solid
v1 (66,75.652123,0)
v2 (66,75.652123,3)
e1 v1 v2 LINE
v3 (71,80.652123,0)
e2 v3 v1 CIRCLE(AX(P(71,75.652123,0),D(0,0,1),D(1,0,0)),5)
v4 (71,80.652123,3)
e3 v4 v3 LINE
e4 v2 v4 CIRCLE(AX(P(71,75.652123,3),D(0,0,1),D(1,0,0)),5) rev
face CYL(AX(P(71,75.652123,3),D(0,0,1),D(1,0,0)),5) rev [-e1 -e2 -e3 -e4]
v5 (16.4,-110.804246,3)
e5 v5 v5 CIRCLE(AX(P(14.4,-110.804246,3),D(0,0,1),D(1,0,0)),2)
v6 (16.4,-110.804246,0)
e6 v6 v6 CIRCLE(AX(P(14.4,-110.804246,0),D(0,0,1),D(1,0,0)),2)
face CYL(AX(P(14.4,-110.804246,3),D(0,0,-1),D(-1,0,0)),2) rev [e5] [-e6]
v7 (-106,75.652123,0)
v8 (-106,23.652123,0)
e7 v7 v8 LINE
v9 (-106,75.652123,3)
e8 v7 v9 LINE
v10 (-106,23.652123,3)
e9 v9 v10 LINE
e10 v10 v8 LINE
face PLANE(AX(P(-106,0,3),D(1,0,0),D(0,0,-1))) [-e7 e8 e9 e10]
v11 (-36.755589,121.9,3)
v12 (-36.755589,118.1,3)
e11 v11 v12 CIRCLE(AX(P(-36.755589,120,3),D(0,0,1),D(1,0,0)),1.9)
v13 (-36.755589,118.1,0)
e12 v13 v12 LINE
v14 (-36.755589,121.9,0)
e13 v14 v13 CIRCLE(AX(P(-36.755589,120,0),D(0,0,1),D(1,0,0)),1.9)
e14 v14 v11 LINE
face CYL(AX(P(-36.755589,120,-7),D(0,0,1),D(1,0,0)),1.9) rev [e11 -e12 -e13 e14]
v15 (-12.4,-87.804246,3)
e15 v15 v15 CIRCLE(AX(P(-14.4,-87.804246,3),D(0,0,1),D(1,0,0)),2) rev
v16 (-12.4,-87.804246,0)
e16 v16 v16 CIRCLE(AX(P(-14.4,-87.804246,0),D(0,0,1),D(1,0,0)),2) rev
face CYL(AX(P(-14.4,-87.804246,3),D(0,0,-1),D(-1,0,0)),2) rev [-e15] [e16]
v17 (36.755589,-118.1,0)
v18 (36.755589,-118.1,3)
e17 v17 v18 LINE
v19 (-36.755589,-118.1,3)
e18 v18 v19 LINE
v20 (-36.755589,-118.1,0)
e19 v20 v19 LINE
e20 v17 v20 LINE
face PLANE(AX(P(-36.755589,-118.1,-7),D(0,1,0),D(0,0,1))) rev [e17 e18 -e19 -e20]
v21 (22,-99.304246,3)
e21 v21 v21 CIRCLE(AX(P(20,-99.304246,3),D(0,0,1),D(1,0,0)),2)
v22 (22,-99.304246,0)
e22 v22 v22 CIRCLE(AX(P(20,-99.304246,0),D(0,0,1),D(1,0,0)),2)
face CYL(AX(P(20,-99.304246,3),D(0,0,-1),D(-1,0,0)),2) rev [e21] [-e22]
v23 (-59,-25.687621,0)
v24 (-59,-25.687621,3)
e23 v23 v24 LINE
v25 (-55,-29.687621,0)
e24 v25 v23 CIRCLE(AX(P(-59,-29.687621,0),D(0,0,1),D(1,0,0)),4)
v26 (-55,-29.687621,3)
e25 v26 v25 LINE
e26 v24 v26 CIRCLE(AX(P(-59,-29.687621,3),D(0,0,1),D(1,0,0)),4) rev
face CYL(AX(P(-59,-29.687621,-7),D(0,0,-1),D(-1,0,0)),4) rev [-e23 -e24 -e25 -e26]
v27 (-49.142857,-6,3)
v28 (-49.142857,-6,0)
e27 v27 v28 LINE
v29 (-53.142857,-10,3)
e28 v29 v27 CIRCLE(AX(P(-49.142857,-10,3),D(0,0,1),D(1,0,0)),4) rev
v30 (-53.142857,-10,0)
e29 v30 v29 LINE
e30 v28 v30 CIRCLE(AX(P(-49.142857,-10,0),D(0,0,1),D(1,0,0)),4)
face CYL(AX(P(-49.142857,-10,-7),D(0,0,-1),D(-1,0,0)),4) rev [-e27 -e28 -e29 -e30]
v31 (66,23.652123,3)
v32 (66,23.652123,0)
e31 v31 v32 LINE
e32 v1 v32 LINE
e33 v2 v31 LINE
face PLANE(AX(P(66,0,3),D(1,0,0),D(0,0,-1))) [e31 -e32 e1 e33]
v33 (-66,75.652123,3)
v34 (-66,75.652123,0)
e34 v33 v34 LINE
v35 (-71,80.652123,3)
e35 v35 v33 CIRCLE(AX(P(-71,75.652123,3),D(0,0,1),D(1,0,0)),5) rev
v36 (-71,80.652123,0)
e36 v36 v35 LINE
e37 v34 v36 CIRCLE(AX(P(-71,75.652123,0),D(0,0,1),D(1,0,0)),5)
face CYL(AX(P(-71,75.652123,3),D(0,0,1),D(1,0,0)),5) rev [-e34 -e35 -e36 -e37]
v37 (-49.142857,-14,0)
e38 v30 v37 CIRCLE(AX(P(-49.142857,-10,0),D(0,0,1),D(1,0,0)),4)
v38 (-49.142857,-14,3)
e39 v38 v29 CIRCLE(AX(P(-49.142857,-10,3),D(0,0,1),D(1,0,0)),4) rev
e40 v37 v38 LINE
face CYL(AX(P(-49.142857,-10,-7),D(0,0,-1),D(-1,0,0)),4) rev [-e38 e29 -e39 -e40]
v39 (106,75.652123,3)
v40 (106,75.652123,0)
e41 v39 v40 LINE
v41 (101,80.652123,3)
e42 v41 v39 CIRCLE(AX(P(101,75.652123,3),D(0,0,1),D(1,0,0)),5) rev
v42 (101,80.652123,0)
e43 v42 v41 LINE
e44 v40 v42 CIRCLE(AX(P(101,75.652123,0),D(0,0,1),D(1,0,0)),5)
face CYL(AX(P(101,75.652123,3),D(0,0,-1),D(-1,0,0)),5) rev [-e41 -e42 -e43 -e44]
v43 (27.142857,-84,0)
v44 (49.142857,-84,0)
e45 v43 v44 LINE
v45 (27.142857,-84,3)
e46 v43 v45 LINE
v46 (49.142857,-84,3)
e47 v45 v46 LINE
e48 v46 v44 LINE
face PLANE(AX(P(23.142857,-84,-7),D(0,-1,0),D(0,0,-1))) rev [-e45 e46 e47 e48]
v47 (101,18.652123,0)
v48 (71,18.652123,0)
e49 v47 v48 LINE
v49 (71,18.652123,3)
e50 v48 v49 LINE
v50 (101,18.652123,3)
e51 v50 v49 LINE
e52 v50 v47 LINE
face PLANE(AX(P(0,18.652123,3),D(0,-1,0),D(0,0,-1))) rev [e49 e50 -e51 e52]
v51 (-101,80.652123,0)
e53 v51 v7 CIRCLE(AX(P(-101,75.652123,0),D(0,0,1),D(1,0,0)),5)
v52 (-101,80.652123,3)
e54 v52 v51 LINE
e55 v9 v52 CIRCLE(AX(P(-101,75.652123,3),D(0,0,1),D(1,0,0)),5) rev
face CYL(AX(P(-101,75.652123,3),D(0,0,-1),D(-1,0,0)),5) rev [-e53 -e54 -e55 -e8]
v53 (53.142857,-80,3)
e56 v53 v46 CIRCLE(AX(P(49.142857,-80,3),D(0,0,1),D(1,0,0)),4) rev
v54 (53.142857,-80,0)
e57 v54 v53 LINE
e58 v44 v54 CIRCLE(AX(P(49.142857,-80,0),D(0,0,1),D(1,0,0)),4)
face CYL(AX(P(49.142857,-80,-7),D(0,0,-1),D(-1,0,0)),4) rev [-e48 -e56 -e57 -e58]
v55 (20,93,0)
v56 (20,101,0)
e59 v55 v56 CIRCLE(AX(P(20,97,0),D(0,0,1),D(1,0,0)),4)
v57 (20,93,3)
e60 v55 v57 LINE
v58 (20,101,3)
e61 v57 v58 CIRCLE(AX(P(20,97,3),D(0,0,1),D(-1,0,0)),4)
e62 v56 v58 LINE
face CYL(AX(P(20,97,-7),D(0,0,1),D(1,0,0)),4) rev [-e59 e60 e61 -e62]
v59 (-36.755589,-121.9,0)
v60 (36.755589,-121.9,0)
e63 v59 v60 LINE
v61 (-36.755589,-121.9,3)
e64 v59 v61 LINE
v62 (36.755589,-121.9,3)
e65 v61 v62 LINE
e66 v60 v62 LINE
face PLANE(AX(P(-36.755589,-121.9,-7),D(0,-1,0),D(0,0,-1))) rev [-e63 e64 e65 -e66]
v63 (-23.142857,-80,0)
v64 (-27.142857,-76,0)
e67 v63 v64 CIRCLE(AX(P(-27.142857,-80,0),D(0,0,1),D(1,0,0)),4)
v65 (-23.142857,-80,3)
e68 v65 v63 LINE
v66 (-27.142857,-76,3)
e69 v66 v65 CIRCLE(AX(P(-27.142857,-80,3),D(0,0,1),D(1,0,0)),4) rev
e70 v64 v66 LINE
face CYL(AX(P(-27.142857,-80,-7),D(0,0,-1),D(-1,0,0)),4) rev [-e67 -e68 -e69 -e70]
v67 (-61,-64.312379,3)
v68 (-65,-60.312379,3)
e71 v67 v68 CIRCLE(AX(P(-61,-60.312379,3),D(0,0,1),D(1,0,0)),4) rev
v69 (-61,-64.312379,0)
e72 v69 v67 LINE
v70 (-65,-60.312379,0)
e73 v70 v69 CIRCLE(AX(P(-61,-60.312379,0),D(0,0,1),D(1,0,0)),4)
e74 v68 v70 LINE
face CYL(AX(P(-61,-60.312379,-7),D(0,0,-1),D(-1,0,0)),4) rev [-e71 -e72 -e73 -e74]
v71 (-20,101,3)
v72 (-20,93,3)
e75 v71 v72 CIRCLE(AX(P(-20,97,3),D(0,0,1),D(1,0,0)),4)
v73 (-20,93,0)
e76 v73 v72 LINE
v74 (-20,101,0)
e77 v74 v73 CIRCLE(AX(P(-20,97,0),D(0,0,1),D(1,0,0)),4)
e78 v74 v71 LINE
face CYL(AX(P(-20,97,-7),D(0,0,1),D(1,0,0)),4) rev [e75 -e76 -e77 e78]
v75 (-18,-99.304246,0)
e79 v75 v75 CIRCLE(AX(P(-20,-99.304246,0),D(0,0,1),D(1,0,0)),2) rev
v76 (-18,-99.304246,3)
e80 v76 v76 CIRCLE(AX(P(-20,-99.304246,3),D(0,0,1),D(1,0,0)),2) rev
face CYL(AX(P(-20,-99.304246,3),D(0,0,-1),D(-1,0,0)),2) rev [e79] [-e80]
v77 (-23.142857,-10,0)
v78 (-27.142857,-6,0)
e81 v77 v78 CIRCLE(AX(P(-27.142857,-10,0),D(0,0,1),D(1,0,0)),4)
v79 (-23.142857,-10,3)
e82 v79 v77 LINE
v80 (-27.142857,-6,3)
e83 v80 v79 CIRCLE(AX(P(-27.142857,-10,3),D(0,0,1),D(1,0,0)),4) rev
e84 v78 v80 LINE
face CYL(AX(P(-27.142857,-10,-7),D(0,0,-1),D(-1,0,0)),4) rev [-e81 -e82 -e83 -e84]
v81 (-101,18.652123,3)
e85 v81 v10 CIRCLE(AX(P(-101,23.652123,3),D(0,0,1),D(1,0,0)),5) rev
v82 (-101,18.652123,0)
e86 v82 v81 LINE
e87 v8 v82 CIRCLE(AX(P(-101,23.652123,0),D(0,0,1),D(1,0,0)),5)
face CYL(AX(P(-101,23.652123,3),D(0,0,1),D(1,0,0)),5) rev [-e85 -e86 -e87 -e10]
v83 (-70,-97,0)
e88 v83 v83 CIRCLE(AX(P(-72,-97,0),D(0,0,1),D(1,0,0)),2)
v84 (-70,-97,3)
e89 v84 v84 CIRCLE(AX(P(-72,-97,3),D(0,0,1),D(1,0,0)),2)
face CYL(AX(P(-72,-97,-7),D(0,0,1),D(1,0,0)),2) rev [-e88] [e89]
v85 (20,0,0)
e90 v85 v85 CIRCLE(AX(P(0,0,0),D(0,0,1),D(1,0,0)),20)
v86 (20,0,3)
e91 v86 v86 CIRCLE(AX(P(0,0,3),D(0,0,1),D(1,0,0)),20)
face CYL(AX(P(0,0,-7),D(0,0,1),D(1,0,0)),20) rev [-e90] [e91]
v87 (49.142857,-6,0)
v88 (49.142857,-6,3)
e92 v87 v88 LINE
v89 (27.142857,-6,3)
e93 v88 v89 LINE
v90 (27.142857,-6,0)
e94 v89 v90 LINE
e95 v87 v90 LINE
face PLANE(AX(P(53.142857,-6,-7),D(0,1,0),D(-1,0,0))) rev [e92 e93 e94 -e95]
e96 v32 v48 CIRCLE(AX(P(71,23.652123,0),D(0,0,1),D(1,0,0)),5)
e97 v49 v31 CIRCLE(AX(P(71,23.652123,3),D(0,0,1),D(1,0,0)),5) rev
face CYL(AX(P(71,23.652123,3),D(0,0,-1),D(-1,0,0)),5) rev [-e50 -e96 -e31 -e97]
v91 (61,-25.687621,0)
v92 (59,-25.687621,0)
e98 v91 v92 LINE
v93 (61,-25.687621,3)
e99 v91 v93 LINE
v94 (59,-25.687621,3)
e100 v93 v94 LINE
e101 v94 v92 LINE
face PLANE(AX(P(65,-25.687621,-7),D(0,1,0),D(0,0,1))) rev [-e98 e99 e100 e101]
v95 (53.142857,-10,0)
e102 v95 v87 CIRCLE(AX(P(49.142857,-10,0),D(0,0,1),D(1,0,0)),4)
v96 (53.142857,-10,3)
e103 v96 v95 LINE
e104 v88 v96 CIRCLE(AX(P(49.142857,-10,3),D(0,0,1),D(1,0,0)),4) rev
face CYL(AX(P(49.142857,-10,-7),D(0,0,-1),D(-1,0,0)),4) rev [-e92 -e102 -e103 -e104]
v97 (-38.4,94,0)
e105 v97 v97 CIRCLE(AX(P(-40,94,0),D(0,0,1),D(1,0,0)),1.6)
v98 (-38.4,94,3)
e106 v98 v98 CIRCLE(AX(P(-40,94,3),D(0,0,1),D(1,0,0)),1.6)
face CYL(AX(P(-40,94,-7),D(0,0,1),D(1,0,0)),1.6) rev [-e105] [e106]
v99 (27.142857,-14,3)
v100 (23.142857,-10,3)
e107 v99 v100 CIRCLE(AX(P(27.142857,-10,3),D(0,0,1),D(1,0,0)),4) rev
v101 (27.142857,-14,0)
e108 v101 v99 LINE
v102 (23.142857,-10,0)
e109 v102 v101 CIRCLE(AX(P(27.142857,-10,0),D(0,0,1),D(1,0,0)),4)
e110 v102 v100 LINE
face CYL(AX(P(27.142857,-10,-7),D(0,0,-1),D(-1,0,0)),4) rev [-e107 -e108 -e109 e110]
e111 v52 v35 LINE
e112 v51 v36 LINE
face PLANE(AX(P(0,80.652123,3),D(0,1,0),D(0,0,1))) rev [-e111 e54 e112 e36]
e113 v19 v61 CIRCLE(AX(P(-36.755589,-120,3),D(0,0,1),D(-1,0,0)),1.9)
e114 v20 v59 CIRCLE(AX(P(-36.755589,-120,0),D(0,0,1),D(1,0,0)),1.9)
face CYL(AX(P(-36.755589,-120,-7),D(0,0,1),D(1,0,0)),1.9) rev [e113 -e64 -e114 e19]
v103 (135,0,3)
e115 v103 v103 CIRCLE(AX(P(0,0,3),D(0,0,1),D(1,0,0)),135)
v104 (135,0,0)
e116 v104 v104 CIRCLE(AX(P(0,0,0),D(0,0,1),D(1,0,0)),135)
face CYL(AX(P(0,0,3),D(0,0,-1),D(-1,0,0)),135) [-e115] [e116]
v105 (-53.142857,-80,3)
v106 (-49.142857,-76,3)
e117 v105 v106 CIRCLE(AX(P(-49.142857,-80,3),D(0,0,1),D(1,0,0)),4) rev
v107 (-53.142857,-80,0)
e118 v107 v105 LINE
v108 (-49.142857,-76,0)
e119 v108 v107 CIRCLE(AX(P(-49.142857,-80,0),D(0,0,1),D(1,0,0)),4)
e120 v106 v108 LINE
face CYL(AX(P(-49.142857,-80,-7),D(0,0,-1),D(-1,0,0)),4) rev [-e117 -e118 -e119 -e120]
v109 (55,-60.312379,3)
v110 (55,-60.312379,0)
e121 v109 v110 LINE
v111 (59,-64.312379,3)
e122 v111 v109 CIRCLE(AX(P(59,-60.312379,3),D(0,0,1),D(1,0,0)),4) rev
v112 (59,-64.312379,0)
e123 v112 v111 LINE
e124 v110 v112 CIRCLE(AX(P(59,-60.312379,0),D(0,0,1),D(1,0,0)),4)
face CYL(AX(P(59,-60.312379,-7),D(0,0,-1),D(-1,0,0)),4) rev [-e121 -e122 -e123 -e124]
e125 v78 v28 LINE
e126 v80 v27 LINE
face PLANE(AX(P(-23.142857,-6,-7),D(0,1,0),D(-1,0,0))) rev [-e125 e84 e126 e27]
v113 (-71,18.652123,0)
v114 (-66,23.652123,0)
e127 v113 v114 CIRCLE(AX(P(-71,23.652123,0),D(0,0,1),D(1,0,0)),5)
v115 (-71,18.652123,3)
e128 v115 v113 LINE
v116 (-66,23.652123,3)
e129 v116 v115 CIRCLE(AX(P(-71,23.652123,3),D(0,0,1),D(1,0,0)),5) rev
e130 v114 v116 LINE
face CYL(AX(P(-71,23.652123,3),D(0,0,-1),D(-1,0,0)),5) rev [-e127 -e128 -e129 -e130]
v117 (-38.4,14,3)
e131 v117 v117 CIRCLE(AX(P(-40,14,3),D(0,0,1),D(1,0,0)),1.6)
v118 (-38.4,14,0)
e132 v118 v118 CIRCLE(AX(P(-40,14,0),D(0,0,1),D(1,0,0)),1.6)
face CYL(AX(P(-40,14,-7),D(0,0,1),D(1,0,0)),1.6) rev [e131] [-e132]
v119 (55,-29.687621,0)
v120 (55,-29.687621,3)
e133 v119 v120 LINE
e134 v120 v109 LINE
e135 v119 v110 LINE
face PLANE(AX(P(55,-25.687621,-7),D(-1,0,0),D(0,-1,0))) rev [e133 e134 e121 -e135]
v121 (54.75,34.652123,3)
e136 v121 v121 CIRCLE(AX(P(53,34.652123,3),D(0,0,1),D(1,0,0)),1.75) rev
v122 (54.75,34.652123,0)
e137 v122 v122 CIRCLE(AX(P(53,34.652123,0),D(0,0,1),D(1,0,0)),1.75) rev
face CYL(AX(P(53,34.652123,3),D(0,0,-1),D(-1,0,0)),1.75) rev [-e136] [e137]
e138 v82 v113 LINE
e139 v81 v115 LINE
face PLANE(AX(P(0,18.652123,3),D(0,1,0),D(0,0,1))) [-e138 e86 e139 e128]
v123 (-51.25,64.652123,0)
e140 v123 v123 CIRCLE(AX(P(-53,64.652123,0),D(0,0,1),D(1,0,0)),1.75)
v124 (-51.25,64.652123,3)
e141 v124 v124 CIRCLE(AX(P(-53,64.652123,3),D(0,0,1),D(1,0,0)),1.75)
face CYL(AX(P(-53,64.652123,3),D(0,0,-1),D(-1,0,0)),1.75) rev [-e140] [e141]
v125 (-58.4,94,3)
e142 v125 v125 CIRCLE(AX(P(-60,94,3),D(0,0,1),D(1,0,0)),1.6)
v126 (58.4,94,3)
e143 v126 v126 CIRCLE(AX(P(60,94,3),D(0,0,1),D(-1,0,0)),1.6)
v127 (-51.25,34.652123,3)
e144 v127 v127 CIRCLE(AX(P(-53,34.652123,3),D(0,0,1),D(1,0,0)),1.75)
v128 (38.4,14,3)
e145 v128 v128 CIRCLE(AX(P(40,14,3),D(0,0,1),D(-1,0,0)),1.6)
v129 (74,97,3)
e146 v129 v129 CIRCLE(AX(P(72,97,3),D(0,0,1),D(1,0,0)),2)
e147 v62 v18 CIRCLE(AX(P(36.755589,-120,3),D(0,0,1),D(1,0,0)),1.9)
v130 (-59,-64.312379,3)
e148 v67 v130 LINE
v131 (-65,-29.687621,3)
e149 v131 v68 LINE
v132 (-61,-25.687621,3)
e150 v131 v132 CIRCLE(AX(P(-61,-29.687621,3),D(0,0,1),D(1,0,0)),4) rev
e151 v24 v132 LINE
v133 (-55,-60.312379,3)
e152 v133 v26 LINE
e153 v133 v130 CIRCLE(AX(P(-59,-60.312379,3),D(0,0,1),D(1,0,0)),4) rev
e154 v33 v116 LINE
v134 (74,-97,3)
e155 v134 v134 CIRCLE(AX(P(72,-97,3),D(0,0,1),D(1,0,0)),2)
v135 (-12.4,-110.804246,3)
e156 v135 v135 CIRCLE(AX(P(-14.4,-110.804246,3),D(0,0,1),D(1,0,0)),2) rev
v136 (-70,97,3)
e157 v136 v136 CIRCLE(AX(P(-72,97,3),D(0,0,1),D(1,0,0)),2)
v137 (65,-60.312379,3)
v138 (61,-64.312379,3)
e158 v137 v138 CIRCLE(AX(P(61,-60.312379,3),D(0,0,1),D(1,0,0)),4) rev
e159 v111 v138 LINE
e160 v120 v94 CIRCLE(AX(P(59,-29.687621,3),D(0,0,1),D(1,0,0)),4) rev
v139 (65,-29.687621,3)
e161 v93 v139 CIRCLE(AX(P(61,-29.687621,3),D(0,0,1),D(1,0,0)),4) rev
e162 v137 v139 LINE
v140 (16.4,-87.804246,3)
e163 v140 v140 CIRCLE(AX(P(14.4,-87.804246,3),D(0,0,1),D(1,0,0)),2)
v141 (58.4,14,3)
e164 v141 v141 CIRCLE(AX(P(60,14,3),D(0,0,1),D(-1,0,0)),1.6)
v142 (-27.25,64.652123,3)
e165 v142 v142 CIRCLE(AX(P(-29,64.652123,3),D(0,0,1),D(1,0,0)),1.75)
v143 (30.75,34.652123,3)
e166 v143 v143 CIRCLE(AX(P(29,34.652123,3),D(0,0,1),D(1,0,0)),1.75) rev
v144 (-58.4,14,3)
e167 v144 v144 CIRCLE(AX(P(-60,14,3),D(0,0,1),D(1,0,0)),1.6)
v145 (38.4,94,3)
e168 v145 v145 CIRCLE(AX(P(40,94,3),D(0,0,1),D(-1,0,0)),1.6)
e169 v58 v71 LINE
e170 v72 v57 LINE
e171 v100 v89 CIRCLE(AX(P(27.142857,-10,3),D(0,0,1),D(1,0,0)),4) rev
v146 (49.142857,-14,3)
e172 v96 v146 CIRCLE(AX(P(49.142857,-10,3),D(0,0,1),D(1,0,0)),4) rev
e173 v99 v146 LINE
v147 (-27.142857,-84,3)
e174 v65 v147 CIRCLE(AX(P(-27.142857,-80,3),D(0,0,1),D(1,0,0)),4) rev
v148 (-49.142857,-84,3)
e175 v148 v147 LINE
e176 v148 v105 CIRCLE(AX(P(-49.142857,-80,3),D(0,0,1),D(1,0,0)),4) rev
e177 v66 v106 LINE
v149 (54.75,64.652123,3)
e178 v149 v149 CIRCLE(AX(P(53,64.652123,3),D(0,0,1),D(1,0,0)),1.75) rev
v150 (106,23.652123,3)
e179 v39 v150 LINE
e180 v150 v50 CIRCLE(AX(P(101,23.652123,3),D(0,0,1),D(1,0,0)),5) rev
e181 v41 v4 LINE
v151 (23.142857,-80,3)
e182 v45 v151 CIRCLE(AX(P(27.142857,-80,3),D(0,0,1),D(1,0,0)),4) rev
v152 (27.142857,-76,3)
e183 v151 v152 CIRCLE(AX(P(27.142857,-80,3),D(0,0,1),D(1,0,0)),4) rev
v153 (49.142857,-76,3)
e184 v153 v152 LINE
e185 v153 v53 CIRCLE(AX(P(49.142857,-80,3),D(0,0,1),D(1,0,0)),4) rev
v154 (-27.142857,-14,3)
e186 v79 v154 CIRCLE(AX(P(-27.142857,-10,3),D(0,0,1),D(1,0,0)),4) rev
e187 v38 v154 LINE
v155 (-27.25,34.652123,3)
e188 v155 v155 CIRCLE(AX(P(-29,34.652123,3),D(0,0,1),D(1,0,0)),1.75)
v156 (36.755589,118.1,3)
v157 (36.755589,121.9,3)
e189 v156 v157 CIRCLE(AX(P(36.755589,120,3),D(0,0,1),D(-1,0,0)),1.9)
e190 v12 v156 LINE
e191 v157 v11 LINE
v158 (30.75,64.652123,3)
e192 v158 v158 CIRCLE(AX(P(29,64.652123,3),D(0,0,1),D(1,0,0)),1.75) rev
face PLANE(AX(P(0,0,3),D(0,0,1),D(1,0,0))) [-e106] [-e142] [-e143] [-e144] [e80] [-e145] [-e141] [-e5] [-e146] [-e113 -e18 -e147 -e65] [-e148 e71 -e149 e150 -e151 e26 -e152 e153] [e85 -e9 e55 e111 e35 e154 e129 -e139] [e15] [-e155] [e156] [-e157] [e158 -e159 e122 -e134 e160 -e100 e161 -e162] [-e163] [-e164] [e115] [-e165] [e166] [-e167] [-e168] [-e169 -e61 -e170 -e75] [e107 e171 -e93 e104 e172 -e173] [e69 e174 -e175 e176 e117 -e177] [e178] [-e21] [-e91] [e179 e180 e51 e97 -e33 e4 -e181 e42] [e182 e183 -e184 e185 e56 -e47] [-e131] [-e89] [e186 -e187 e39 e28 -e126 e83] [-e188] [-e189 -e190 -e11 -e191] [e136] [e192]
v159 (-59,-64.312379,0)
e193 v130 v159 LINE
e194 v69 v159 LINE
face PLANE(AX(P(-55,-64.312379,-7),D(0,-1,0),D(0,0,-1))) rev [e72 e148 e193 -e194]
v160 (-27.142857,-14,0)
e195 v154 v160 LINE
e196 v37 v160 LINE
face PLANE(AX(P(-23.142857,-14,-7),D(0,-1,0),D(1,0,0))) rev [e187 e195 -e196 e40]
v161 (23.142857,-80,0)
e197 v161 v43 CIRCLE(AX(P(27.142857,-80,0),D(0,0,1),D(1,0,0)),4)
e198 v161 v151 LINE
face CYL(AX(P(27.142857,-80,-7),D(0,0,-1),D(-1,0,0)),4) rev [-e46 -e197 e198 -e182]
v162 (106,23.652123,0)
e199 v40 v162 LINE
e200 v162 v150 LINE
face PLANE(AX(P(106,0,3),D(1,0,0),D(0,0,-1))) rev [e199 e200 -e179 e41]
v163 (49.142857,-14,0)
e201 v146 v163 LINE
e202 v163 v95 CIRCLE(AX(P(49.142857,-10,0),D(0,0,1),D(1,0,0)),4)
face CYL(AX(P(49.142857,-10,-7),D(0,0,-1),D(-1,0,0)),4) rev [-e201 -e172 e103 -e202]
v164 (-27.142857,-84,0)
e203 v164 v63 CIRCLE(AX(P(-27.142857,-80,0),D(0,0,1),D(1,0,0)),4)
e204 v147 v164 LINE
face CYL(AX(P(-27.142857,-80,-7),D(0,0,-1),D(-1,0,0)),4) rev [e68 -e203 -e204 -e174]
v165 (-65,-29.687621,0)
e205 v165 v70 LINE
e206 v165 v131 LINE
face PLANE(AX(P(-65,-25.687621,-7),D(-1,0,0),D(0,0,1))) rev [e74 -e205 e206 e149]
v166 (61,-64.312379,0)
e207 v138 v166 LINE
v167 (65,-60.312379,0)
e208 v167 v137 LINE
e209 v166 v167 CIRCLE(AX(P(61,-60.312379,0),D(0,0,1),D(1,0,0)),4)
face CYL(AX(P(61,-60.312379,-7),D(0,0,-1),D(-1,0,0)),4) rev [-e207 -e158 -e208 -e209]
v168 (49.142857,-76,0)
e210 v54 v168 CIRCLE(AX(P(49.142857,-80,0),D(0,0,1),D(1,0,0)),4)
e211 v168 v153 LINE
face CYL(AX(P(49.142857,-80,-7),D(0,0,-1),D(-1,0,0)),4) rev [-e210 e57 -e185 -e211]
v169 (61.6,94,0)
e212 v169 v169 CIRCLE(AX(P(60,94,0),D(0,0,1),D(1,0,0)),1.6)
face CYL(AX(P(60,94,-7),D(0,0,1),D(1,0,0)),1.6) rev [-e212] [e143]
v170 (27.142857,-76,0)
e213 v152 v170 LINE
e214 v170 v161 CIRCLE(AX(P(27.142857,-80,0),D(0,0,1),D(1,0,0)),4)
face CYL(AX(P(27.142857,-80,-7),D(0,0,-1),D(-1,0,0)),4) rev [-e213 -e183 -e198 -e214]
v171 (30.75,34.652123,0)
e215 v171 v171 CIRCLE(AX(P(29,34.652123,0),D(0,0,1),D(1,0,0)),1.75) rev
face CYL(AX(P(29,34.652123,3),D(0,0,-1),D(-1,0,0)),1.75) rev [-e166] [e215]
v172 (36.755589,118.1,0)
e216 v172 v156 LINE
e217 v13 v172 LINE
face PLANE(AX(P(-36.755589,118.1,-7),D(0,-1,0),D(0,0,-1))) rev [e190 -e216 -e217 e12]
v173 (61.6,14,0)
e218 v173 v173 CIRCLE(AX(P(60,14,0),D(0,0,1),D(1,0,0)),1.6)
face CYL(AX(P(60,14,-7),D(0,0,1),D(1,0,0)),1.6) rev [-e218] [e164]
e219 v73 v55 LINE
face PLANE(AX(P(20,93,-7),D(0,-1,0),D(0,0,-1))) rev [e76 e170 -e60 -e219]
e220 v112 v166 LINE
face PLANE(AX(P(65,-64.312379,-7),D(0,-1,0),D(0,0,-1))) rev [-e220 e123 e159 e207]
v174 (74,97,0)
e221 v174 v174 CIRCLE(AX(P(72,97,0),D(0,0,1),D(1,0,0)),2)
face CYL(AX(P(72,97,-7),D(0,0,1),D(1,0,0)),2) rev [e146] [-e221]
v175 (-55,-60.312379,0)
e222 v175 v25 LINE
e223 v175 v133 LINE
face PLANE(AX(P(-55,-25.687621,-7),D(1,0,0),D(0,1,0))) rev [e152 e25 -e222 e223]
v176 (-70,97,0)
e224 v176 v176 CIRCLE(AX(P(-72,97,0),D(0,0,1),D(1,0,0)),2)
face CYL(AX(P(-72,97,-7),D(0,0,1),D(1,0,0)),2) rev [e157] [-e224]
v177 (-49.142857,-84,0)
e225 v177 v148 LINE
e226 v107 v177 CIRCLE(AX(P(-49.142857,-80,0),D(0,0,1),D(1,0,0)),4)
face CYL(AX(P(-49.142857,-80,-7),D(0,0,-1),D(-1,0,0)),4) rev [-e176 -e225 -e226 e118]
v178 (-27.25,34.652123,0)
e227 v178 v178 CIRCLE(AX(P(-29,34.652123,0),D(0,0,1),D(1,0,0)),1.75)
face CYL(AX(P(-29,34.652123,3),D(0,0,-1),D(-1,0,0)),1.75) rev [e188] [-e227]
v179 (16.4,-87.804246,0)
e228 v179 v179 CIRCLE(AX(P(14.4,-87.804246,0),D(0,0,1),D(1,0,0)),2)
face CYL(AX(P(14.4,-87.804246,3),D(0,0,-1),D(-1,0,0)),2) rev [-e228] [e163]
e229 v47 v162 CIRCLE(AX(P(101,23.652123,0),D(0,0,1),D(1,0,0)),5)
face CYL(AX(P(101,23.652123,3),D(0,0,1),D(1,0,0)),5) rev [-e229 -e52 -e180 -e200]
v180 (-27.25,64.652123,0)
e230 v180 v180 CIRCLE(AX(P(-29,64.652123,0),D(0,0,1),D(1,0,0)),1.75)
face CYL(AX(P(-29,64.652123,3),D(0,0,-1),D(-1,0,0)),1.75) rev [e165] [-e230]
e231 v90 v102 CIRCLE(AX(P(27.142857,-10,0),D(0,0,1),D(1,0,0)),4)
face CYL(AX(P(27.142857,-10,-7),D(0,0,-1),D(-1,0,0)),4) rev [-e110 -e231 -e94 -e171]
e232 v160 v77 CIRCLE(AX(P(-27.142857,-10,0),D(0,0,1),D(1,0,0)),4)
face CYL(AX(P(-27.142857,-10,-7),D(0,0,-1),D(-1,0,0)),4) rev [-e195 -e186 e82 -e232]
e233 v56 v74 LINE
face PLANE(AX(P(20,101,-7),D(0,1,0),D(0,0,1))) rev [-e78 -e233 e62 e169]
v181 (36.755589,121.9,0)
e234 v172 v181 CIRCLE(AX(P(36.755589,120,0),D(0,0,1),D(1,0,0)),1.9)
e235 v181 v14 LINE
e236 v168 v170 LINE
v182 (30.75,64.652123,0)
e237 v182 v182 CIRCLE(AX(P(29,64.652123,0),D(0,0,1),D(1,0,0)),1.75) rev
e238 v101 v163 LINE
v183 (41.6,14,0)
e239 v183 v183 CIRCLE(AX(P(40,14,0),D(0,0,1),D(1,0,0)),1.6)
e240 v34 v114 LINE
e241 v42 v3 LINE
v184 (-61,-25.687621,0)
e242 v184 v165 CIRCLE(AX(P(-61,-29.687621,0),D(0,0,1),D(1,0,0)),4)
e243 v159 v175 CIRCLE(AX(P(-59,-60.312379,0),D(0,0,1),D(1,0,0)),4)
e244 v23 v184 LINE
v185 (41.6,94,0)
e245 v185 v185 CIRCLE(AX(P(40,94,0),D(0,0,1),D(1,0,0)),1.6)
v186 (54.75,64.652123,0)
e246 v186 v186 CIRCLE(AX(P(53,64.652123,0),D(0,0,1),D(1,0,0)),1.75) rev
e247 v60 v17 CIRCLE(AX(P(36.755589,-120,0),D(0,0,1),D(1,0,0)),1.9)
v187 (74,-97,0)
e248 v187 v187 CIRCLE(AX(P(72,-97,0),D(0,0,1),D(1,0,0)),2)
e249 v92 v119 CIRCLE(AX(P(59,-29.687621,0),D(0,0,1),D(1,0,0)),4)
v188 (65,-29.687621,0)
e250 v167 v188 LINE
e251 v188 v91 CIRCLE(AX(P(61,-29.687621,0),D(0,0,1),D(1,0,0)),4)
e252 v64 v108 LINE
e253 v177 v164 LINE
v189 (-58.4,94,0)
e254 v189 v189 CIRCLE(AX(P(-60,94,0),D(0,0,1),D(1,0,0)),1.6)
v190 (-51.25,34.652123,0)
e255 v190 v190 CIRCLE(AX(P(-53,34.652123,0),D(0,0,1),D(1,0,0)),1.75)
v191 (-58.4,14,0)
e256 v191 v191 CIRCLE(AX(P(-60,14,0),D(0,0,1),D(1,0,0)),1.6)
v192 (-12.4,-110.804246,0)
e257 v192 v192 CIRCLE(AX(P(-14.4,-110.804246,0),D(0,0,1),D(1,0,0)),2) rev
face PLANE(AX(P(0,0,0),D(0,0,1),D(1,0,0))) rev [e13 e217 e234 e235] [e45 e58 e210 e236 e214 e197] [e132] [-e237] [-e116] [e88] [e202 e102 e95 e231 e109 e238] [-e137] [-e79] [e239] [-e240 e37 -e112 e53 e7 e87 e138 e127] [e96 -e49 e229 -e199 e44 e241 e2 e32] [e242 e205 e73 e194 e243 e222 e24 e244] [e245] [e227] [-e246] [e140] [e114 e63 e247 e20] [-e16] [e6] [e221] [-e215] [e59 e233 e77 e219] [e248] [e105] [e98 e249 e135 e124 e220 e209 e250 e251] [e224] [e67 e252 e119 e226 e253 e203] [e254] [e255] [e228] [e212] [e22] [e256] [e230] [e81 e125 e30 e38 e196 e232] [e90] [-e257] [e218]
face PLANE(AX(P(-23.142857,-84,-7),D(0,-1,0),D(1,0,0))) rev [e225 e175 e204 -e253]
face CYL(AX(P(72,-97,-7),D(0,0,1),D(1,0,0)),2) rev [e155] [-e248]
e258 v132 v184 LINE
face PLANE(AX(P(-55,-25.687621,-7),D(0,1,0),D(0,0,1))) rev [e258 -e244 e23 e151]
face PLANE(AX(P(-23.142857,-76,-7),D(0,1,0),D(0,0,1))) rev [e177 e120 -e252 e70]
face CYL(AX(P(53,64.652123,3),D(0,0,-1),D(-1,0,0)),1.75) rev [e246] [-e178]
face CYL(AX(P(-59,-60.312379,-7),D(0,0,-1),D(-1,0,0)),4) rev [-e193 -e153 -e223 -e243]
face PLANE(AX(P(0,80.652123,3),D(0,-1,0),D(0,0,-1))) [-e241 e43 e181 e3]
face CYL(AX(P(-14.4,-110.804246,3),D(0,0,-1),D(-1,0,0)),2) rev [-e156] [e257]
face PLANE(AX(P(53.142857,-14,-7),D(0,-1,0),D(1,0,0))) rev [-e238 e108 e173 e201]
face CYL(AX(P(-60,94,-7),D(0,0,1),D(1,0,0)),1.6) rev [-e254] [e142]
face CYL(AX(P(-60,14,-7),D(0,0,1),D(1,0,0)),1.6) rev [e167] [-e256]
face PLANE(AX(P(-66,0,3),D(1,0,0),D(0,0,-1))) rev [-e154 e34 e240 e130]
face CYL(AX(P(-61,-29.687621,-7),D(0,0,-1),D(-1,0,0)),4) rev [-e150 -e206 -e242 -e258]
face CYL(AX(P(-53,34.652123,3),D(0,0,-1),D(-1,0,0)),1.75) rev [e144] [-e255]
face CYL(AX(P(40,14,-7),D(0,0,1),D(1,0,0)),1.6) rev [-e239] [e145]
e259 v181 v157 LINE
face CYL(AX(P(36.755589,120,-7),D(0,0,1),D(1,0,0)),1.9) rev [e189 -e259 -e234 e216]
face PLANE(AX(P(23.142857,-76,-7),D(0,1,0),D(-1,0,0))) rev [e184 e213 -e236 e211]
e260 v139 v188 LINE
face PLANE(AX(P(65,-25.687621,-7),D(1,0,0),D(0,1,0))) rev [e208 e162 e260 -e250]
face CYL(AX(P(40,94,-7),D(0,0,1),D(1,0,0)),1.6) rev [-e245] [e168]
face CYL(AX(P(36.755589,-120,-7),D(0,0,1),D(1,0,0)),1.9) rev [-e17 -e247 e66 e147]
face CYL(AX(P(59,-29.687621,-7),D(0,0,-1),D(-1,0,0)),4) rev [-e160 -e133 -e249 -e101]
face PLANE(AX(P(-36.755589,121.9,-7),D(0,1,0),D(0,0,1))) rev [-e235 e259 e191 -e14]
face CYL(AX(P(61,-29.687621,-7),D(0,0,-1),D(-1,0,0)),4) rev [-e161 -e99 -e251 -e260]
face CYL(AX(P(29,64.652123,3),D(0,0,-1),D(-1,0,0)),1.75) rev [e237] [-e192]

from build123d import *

# Parameters (mm, degrees)
SKETCH_1_R          = 135
SKETCH_1_R_2        = 2
SKETCH_1_W          = 40
SKETCH_1_H          = 62
SKETCH_1_R_3        = 1.75
EXTRUDE_1_DEPTH     = 3
FILLET_1_R          = 5
SKETCH_2_R          = 20
SKETCH_2_R_2        = 2
SKETCH_2_R_3        = 1.6
SKETCH_2_W          = 30
SKETCH_2_H          = 8
SKETCH_2_W_2        = 10
SKETCH_2_H_2        = 38.624758258
CUT_EXTRUDE_1_DEPTH = 10
FILLET_2_R          = 4


with BuildPart() as part:
    # 草图1 → 凸台-拉伸1 (new body)
    with BuildSketch(Plane.XY):
        Circle(SKETCH_1_R)
        with Locations((-14.4, -110.804246301)):
            Circle(SKETCH_1_R_2, mode=Mode.SUBTRACT)
        with Locations((-20, -99.304246301)):
            Circle(SKETCH_1_R_2, mode=Mode.SUBTRACT)
        with Locations((-14.4, -87.804246301)):
            Circle(SKETCH_1_R_2, mode=Mode.SUBTRACT)
        with Locations((14.4, -110.804246301)):
            Circle(SKETCH_1_R_2, mode=Mode.SUBTRACT)
        with Locations((14.4, -87.804246301)):
            Circle(SKETCH_1_R_2, mode=Mode.SUBTRACT)
        with Locations((20, -99.304246301)):
            Circle(SKETCH_1_R_2, mode=Mode.SUBTRACT)
        with Locations((-86, 49.65212315)):
            Rectangle(SKETCH_1_W, SKETCH_1_H, mode=Mode.SUBTRACT)
        with Locations((-53, 34.65212315)):
            Circle(SKETCH_1_R_3, mode=Mode.SUBTRACT)
        with Locations((-53, 64.65212315)):
            Circle(SKETCH_1_R_3, mode=Mode.SUBTRACT)
        with Locations((-29, 34.65212315)):
            Circle(SKETCH_1_R_3, mode=Mode.SUBTRACT)
        with Locations((-29, 64.65212315)):
            Circle(SKETCH_1_R_3, mode=Mode.SUBTRACT)
        with Locations((29, 34.65212315)):
            Circle(SKETCH_1_R_3, mode=Mode.SUBTRACT)
        with Locations((29, 64.65212315)):
            Circle(SKETCH_1_R_3, mode=Mode.SUBTRACT)
        with Locations((53, 34.65212315)):
            Circle(SKETCH_1_R_3, mode=Mode.SUBTRACT)
        with Locations((53, 64.65212315)):
            Circle(SKETCH_1_R_3, mode=Mode.SUBTRACT)
        with Locations((86, 49.65212315)):
            Rectangle(SKETCH_1_W, SKETCH_1_H, mode=Mode.SUBTRACT)
    extrude(amount=EXTRUDE_1_DEPTH)

    # 圆角1
    fillet_1_edges = [part.edges().sort_by_distance(p)[0] for p in [
        (66, 80.65212315, 1.5),
        (66, 18.65212315, 1.5),
        (106, 18.65212315, 1.5),
        (106, 80.65212315, 1.5),
        (-106, 80.65212315, 1.5),
        (-106, 18.65212315, 1.5),
        (-66, 18.65212315, 1.5),
        (-66, 80.65212315, 1.5),
    ]]
    fillet(fillet_1_edges, radius=FILLET_1_R)

    # 草图2 → 切除-拉伸1 (cut)
    with BuildSketch(Plane.XY.offset(3)):
        Circle(SKETCH_2_R)
        with Locations((-72, 97)):
            Circle(SKETCH_2_R_2)
        with Locations((72, 97)):
            Circle(SKETCH_2_R_2)
        with Locations((72, -97)):
            Circle(SKETCH_2_R_2)
        with Locations((-72, -97)):
            Circle(SKETCH_2_R_2)
        with Locations((-60, 94)):
            Circle(SKETCH_2_R_3)
        with Locations((-60, 14)):
            Circle(SKETCH_2_R_3)
        with Locations((-40, 94)):
            Circle(SKETCH_2_R_3)
        with Locations((-40, 14)):
            Circle(SKETCH_2_R_3)
        with Locations((60, 14)):
            Circle(SKETCH_2_R_3)
        with Locations((60, 94)):
            Circle(SKETCH_2_R_3)
        with Locations((40, 94)):
            Circle(SKETCH_2_R_3)
        with Locations((40, 14)):
            Circle(SKETCH_2_R_3)
        with Locations((38.142857143, -10)):
            Rectangle(SKETCH_2_W, SKETCH_2_H)
        with Locations((-38.142857143, -10)):
            Rectangle(SKETCH_2_W, SKETCH_2_H)
        with Locations((38.142857143, -80)):
            Rectangle(SKETCH_2_W, SKETCH_2_H)
        with Locations((-38.142857143, -80)):
            Rectangle(SKETCH_2_W, SKETCH_2_H)
        with Locations((60, -45)):
            Rectangle(SKETCH_2_W_2, SKETCH_2_H_2)
        with Locations((-60, -45)):
            Rectangle(SKETCH_2_W_2, SKETCH_2_H_2)
        with BuildLine():
            Line((-36.755588957, 121.9), (36.755588957, 121.9))
            ThreePointArc((36.755588957, 121.9), (38.655588957, 120), (36.755588957, 118.1))
            Line((36.755588957, 118.1), (-36.755588957, 118.1))
            ThreePointArc((-36.755588957, 118.1), (-38.655588957, 120), (-36.755588957, 121.9))
        make_face()
        with BuildLine():
            Line((-36.755588957, -118.1), (36.755588957, -118.1))
            ThreePointArc((36.755588957, -118.1), (38.655588957, -120), (36.755588957, -121.9))
            Line((36.755588957, -121.9), (-36.755588957, -121.9))
            ThreePointArc((-36.755588957, -121.9), (-38.655588957, -120), (-36.755588957, -118.1))
        make_face()
        with BuildLine():
            Line((20, 101), (-20, 101))
            ThreePointArc((-20, 101), (-24, 97), (-20, 93))
            Line((-20, 93), (20, 93))
            ThreePointArc((20, 93), (24, 97), (20, 101))
        make_face()
    extrude(amount=-CUT_EXTRUDE_1_DEPTH, mode=Mode.SUBTRACT)

    # 圆角2
    fillet_2_edges = [part.edges().sort_by_distance(p)[0] for p in [
        (-53.142857143, -84, 1.5),
        (-23.142857143, -84, 1.5),
        (-53.142857143, -76, 1.5),
        (-23.142857143, -76, 1.5),
        (23.142857143, -84, 1.5),
        (23.142857143, -76, 1.5),
        (53.142857143, -76, 1.5),
        (53.142857143, -84, 1.5),
        (-53.142857143, -14, 1.5),
        (-53.142857143, -6, 1.5),
        (-23.142857143, -14, 1.5),
        (-23.142857143, -6, 1.5),
        (23.142857143, -14, 1.5),
        (53.142857143, -14, 1.5),
        (23.142857143, -6, 1.5),
        (53.142857143, -6, 1.5),
        (-55, -64.312379129, 1.5),
        (-65, -64.312379129, 1.5),
        (55, -64.312379129, 1.5),
        (65, -64.312379129, 1.5),
        (-65, -25.687620871, 1.5),
        (-55, -25.687620871, 1.5),
        (65, -25.687620871, 1.5),
        (55, -25.687620871, 1.5),
    ]]
    fillet(fillet_2_edges, radius=FILLET_2_R - 0.0001)  # a hair under: the kernel refuses the full size


solid = part.part
